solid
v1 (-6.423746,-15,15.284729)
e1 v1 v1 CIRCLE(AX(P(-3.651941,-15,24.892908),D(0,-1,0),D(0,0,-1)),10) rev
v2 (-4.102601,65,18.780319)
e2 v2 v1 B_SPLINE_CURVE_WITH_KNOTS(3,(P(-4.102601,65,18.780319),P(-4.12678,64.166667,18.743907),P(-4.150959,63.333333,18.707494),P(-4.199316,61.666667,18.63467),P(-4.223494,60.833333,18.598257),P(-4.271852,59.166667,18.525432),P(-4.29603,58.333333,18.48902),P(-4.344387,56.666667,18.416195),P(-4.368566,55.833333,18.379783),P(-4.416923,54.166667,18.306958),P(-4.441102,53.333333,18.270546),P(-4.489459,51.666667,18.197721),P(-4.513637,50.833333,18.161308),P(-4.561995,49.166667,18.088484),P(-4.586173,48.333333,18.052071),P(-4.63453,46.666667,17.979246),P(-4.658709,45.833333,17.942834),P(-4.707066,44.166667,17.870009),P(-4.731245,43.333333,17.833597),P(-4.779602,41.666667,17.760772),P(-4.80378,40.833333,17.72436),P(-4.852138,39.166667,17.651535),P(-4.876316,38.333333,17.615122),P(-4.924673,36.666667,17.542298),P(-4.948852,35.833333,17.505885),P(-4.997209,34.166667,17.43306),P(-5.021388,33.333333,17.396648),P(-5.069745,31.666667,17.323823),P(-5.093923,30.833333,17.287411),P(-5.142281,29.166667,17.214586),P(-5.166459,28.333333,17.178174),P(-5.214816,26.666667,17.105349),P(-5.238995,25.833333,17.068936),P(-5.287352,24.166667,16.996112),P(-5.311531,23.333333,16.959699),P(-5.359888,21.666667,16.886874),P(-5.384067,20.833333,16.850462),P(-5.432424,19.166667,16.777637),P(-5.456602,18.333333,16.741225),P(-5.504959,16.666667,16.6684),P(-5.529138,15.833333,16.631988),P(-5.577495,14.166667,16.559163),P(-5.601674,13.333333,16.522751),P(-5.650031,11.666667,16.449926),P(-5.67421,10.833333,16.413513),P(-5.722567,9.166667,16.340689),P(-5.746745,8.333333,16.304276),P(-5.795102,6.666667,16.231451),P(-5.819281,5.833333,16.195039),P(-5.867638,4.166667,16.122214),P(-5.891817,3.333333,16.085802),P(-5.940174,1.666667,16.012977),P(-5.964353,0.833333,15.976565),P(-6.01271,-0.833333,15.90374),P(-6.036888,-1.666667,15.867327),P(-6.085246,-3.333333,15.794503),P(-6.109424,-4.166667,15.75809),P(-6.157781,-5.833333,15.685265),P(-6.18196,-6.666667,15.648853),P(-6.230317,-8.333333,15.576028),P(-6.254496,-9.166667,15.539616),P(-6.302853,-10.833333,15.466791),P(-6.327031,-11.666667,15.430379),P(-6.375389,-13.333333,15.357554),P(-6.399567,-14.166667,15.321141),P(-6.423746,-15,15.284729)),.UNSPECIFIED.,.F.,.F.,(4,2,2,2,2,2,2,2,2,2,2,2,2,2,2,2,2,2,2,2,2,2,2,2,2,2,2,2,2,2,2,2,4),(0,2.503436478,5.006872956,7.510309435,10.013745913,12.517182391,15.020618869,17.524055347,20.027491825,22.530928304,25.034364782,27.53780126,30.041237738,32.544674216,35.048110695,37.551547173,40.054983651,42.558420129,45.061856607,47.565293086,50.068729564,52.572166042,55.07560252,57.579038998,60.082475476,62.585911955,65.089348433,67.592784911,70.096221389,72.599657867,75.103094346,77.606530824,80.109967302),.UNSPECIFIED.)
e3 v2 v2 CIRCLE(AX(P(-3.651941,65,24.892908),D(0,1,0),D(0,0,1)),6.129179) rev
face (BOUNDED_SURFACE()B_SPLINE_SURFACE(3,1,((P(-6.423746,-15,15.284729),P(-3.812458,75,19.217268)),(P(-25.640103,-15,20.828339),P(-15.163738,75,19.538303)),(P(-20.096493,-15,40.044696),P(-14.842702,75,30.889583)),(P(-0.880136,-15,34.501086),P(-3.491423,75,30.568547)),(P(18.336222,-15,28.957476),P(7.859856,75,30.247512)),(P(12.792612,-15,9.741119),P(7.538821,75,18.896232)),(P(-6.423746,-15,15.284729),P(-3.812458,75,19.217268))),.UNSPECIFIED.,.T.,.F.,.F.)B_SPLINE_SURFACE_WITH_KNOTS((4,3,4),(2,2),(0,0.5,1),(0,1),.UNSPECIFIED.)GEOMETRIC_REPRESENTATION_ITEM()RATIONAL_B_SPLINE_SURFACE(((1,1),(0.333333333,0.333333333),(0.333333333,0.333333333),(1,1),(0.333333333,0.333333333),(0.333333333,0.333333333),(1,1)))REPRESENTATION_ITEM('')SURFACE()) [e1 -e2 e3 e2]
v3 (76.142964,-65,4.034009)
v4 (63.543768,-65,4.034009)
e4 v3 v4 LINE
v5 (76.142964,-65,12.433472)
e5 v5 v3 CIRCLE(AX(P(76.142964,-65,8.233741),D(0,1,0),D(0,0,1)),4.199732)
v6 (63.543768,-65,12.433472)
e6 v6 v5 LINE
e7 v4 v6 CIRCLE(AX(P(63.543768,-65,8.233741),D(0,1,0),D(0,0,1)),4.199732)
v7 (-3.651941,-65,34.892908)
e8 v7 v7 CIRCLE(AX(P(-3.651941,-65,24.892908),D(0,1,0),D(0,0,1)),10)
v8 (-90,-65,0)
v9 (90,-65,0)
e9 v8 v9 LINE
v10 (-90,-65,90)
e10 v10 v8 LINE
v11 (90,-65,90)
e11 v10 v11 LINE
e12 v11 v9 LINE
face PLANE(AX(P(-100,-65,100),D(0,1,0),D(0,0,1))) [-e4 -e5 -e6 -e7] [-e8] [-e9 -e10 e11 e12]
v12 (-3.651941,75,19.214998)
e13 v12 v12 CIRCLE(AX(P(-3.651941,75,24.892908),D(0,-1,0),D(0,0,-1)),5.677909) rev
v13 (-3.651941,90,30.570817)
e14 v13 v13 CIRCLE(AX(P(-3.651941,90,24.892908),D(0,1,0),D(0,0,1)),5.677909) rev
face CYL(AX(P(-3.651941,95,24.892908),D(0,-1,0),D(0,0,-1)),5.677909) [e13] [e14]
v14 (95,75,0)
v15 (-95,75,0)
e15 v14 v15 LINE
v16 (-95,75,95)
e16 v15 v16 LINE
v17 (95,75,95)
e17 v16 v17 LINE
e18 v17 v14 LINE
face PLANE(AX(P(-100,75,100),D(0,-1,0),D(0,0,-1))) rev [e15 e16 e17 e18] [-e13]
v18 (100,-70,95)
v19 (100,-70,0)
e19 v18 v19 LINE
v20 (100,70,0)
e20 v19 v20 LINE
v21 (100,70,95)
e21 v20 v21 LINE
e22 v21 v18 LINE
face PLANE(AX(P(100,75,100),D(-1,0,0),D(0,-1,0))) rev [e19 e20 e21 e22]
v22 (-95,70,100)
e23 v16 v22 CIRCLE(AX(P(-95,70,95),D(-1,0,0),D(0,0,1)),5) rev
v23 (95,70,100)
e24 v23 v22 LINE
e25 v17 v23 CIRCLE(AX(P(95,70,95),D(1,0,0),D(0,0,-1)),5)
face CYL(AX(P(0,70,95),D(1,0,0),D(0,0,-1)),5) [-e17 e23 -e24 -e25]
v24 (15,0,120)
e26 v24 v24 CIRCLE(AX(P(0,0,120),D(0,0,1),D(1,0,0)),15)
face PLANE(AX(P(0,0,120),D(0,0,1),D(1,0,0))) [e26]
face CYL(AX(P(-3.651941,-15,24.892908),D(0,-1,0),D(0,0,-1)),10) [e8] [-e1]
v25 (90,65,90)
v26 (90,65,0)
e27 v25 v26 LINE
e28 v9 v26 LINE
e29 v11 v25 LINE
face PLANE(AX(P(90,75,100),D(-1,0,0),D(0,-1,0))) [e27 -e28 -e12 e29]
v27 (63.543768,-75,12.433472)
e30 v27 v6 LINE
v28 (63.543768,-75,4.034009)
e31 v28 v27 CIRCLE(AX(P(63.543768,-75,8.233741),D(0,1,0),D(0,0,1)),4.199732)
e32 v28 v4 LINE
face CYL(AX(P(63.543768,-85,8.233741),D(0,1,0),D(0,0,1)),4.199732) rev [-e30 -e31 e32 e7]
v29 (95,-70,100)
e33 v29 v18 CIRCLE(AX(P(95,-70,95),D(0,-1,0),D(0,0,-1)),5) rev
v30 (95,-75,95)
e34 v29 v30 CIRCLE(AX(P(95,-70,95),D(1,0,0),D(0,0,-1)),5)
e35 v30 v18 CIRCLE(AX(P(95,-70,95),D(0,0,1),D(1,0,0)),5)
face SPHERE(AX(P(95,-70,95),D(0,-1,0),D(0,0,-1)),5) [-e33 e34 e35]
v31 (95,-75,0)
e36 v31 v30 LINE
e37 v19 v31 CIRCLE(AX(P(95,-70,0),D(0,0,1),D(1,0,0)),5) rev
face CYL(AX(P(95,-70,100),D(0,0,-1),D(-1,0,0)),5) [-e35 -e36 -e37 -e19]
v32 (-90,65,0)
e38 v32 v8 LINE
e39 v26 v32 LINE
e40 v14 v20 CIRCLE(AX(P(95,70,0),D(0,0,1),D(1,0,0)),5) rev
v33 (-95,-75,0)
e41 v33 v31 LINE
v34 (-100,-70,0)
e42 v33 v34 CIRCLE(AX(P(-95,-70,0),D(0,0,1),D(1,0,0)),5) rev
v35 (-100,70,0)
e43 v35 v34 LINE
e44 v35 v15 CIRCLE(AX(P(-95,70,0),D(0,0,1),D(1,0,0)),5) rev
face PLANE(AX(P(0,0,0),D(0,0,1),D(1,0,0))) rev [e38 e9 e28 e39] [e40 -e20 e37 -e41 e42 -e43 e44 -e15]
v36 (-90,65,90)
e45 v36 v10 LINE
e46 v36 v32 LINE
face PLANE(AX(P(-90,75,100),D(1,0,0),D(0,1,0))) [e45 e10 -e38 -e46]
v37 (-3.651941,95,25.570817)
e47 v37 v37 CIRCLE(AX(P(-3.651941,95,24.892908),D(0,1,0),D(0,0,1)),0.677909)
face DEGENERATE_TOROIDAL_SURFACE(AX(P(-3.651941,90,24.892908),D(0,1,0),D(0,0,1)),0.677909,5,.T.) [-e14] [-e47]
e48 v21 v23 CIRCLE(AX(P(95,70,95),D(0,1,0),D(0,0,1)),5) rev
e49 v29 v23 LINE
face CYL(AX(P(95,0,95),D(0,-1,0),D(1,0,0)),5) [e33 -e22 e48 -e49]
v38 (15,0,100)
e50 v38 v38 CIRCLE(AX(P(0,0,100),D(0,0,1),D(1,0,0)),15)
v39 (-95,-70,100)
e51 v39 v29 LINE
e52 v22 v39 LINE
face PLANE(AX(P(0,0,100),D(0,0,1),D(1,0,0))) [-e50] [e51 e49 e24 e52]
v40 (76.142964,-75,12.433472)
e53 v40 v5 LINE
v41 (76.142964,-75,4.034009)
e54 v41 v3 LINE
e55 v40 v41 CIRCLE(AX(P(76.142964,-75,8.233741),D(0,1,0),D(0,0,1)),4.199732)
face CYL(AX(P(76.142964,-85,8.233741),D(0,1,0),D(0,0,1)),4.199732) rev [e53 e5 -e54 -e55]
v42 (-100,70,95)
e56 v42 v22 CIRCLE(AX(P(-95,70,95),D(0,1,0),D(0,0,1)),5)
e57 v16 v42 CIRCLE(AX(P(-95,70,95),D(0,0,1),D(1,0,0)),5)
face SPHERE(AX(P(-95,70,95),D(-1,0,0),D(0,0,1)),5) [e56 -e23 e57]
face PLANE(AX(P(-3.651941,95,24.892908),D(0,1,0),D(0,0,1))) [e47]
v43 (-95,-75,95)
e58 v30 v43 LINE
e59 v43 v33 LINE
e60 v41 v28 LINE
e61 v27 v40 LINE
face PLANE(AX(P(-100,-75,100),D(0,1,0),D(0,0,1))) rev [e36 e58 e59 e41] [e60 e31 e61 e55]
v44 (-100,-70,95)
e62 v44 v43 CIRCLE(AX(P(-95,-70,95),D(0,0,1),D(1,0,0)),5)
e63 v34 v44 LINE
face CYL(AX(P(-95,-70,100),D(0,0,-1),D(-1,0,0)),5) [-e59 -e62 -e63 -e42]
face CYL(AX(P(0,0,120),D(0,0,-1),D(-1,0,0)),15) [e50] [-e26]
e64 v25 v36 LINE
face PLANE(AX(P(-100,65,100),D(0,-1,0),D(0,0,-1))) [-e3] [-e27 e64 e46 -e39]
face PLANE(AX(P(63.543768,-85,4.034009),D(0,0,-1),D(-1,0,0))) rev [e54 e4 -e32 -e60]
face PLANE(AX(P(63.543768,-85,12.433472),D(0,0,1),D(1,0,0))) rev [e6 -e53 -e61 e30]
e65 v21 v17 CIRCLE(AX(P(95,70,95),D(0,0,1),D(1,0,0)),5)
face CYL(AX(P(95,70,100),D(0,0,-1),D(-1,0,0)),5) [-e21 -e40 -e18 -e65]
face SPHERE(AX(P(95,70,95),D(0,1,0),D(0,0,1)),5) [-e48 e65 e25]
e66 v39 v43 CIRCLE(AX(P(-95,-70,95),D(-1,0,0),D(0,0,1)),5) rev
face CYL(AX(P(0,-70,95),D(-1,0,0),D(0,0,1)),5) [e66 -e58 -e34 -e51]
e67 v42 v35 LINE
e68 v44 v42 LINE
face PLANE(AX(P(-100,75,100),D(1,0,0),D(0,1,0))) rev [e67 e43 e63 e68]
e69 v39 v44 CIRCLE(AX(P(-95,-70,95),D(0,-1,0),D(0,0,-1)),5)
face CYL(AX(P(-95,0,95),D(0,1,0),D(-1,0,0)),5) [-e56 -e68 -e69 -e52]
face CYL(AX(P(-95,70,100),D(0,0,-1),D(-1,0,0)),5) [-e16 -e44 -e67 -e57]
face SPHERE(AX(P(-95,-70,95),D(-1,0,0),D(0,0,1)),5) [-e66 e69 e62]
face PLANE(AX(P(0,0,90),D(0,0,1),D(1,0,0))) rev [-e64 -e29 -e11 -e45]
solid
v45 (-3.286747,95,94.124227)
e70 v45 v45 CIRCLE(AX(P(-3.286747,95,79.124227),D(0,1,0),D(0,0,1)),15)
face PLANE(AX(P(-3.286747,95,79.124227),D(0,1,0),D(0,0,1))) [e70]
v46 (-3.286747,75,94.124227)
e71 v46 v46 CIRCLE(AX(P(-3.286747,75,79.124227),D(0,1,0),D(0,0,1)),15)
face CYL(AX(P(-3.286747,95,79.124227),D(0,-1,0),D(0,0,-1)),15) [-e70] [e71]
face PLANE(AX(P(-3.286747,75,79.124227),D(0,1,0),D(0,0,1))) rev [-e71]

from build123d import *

# Parameters (mm, degrees)
SKETCH_1_W          = 200
SKETCH_1_H          = 150
EXTRUDE_1_DEPTH     = 100
SKETCH_3_R          = 15
EXTRUDE_2_DEPTH     = 20
SHELL_7_T           = -10
SKETCH_5_R          = 15
EXTRUDE_5_DEPTH     = 20
SKETCH_4_R          = 10
EXTRUDE_6_DEPTH     = 50
SKETCH_7_3_R        = 5.677909162
EXTRUDE_7_DEPTH     = 20
FILLET_2_R          = 5
FILLET_3_R          = 5
CUT_EXTRUDE_4_DEPTH = 20


with BuildPart() as part:
    # 草图1 → 凸台-拉伸1 (new body)
    with BuildSketch(Plane.XY):
        Rectangle(SKETCH_1_W, SKETCH_1_H)
    extrude(amount=EXTRUDE_1_DEPTH)

    # 抽壳7
    shell_7_openings = [part.faces().sort_by_distance(p)[0] for p in [
        (0, 0, 0),
    ]]
    offset(amount=SHELL_7_T, openings=shell_7_openings, kind=Kind.INTERSECTION)

    # 草图5 → 凸台-拉伸5 (add)
    with BuildSketch(Plane.XY.offset(100)):
        Circle(SKETCH_5_R)
    extrude(amount=EXTRUDE_5_DEPTH)

    # 草图4 → 凸台-拉伸6 (add)
    with BuildSketch(Plane(origin=(0, -65, 0), x_dir=(1, 0, 0), z_dir=(0, 1, 0))):
        with Locations(Location((-3.651940705, -24.892907654, 0), (0, 0, 270))):
            Circle(SKETCH_4_R)
    extrude(amount=EXTRUDE_6_DEPTH)

    # 放样2: read off the stored shape, not the designer's step
    # 放样2: loft between two sections, ruled curve by curve
    loft_2_from = [
        Edge.make_bspline([(-6.42374571, -15, 15.284729002), (-25.640103015, -15, 20.828339012), (-20.096493004, -15, 40.044696317), (-0.8801357, -15, 34.501086306), (18.336221605, -15, 28.957476296), (12.792611594, -15, 9.741118991), (-6.42374571, -15, 15.284729002)], [0, 0, 0, 0, 0.5, 0.5, 0.5, 1, 1, 1, 1], 3, [1, 0.333333333, 0.333333333, 1, 0.333333333, 0.333333333, 1]),
    ]
    loft_2_to = [
        Edge.make_bspline([(-3.812458415, 75, 19.217267909), (-15.163737905, 75, 19.538303329), (-14.842702485, 75, 30.889582819), (-3.491422995, 75, 30.568547399), (7.859856496, 75, 30.247511979), (7.538821075, 75, 18.896232489), (-3.812458415, 75, 19.217267909)], [0, 0, 0, 0, 0.5, 0.5, 0.5, 1, 1, 1, 1], 3, [1, 0.333333333, 0.333333333, 1, 0.333333333, 0.333333333, 1]),
    ]
    loft_2 = Solid(Shell([*[Face.make_surface_from_curves(loft_2_from[k], loft_2_to[k]) for k in range(1)], Face(Wire(loft_2_from)), Face(Wire(loft_2_to))]))
    add(loft_2)

    # 草图7<3> → 凸台-拉伸7 (add)
    with BuildSketch(Plane(origin=(0, 75, 0), x_dir=(1, 0, 0), z_dir=(0, 1, 0))):
        with Locations(Location((-3.651940705, -24.892907654, 0), (0, 0, 90))):
            Circle(SKETCH_7_3_R)
    extrude(amount=EXTRUDE_7_DEPTH)

    # 圆角2
    fillet_2_edges = [part.edges().sort_by_distance(p)[0] for p in [
        (-3.651940705, 95, 30.570816816),
    ]]
    fillet(fillet_2_edges, radius=FILLET_2_R)

    # 圆角3
    fillet_3_edges = [part.edges().sort_by_distance(p)[0] for p in [
        (-100, 0, 100),
        (0, -75, 100),
        (100, 0, 100),
        (100, -75, 50),
        (-100, -75, 50),
        (-100, 75, 50),
        (100, 75, 50),
        (0, 75, 100),
    ]]
    fillet(fillet_3_edges, radius=FILLET_3_R)

    # 草图8 → 切除-拉伸4 (cut)
    with BuildSketch(Plane(origin=(0, -65, 0), x_dir=(1, 0, 0), z_dir=(0, 1, 0))):
        with BuildLine():
            Line((63.543768265, -4.034008698), (76.142963697, -4.034008698))
            ThreePointArc((76.142963697, -4.034008698), (80.342695507, -8.233740508), (76.142963697, -12.433472319))
            Line((76.142963697, -12.433472319), (63.543768265, -12.433472319))
            ThreePointArc((63.543768265, -12.433472319), (59.344036454, -8.233740508), (63.543768265, -4.034008698))
        make_face()
    extrude(amount=-CUT_EXTRUDE_4_DEPTH, mode=Mode.SUBTRACT)


with BuildPart() as body_2:
    # 草图3 → 凸台-拉伸2 (new body)
    with BuildSketch(Plane(origin=(0, 75, 0), x_dir=(1, 0, 0), z_dir=(0, 1, 0))):
        with Locations(Location((-3.286746634, -79.124227121, 0), (0, 0, 270))):
            Circle(SKETCH_3_R)
    extrude(amount=EXTRUDE_2_DEPTH)


solid = Compound([part.part, body_2.part])
